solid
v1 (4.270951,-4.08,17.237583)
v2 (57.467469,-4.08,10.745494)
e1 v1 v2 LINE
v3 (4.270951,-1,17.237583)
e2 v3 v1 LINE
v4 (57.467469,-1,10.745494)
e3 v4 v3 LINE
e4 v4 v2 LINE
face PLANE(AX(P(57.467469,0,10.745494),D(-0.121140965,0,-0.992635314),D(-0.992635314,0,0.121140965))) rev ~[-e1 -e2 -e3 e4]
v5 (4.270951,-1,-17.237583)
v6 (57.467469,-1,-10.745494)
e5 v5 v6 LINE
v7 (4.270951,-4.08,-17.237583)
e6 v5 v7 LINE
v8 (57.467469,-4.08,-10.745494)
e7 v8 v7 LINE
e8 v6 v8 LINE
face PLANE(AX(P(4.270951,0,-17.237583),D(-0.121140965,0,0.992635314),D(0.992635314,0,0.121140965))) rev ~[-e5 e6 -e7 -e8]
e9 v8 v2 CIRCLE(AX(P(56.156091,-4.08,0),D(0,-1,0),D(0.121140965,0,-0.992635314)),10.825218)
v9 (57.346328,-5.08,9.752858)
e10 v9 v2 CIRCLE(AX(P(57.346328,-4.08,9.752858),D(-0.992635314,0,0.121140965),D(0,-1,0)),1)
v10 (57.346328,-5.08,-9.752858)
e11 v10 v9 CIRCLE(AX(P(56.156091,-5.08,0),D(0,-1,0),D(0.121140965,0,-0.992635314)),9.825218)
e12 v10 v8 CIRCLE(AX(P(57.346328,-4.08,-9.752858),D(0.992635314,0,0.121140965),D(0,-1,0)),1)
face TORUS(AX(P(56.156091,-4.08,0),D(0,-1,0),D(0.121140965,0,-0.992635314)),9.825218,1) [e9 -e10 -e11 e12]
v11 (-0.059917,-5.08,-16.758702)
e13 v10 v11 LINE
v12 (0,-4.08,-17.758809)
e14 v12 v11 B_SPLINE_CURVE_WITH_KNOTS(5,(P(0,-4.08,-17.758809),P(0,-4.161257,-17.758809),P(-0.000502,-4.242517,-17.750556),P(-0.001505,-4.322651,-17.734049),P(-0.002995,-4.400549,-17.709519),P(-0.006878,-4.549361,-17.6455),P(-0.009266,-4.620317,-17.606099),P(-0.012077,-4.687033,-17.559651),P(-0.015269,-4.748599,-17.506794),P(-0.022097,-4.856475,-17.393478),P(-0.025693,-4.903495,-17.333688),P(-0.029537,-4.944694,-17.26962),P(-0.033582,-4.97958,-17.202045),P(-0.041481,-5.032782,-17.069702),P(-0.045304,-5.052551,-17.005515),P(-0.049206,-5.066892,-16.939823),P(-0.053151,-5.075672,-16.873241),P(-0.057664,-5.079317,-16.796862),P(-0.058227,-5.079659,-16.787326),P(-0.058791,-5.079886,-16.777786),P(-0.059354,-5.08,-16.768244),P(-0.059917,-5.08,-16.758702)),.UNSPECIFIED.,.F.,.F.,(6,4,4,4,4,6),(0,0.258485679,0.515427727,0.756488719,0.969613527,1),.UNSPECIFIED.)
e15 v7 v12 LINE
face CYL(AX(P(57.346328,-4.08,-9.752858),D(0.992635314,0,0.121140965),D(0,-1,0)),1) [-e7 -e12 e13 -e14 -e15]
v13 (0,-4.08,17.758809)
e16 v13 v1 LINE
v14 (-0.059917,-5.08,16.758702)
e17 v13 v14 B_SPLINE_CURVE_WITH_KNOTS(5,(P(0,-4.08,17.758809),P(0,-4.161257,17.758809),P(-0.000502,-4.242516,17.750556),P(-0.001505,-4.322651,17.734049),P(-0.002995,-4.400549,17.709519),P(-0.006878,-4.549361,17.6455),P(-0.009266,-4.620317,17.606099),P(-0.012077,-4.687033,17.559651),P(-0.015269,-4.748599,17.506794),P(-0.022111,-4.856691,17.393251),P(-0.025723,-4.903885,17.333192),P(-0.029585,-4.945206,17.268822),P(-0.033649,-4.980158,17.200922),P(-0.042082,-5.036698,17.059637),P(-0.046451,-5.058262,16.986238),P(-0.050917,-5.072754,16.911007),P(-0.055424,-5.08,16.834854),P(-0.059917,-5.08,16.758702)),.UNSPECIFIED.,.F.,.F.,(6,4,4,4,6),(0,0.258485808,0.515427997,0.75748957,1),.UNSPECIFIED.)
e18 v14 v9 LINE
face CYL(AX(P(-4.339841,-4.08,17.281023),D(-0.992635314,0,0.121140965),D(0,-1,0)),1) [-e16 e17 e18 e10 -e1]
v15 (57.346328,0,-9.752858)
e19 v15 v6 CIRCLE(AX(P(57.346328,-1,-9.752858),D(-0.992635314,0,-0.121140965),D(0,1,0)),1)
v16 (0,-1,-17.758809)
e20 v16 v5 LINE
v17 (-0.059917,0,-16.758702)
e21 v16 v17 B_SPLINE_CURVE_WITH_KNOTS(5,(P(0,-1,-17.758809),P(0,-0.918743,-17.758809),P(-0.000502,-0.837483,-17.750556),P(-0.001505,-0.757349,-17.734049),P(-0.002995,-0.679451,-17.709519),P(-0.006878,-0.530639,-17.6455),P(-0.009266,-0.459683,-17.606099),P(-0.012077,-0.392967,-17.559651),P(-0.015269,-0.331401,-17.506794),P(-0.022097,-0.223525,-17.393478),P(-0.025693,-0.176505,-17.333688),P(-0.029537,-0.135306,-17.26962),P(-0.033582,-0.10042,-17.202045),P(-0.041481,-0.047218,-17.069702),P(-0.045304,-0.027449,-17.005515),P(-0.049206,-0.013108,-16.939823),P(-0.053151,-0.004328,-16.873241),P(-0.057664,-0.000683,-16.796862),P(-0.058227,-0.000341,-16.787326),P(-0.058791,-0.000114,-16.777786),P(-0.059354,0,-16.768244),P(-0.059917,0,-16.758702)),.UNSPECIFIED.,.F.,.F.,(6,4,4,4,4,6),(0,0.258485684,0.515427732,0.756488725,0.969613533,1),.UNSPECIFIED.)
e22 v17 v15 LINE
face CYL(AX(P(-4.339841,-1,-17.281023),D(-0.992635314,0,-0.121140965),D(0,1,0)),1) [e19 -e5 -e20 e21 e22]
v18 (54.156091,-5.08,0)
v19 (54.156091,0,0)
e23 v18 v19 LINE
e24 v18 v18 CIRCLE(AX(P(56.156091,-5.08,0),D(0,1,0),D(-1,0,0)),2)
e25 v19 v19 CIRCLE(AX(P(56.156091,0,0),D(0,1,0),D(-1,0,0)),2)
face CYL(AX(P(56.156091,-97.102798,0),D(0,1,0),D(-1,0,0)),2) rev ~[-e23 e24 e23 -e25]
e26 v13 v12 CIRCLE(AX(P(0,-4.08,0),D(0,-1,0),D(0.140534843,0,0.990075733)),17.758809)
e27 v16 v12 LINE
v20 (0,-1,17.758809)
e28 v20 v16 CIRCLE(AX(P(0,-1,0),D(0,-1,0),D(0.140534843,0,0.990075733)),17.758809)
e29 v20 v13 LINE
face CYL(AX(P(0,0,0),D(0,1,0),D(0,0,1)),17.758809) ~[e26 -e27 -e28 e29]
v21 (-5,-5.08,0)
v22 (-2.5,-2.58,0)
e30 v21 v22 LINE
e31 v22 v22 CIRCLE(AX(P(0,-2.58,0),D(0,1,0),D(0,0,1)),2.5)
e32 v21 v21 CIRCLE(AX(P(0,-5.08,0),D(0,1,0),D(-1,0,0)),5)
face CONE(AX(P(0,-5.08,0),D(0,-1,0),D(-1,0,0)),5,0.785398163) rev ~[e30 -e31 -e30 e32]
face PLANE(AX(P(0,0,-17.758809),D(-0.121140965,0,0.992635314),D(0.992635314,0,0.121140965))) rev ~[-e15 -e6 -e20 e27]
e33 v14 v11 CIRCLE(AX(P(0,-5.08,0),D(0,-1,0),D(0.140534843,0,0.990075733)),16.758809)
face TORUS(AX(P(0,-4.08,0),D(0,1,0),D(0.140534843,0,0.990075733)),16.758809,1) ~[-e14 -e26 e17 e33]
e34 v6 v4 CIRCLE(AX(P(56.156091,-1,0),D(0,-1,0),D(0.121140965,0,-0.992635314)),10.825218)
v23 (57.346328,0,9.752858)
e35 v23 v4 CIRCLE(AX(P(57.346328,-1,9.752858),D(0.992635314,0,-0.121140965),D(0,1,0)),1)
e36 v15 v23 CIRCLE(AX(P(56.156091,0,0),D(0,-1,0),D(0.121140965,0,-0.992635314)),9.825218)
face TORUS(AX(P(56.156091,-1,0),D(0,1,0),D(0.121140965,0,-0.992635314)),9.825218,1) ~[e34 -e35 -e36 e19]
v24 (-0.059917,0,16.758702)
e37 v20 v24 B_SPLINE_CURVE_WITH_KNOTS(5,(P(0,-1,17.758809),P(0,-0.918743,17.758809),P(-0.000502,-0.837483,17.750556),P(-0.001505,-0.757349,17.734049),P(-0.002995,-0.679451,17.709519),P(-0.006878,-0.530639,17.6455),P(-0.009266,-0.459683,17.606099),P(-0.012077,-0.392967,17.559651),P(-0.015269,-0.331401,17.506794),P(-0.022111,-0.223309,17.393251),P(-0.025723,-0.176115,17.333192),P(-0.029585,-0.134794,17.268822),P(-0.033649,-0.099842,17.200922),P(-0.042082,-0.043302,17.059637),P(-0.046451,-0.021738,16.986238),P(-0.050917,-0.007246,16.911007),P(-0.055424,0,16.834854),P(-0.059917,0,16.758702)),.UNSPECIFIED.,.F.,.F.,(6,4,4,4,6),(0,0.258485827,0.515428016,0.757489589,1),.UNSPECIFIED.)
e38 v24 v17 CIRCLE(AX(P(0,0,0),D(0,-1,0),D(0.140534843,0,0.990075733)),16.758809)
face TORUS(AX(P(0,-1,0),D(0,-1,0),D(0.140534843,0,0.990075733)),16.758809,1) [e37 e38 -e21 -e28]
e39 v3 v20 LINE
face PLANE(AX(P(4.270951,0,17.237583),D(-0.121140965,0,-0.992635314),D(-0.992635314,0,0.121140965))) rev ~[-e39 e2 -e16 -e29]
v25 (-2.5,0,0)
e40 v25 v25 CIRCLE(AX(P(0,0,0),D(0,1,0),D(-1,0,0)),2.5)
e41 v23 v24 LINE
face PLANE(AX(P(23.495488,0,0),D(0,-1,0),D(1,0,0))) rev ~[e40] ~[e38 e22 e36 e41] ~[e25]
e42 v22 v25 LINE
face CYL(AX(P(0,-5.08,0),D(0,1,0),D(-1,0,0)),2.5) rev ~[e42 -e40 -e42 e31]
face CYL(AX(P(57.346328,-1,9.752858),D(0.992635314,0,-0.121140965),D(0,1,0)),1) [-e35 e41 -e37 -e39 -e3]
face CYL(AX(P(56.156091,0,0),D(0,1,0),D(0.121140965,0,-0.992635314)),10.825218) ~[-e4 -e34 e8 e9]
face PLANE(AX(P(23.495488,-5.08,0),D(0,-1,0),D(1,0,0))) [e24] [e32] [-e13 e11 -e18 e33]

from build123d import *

# Parameters (mm, degrees)
F1_DEPTH       = 5.08
F2_T1_DEPTH    = 62.1438386925
F2_T3_DEPTH    = 62.1438386925
F2_T6_ANGLE    = 166.0840890898
F2_T8_ANGLE    = 196.1575929171
F3_T1_DEPTH    = 62.1438386925
F3_T3_DEPTH    = 62.1438386925
F3_T6_ANGLE    = 166.0840890898
F3_T8_ANGLE    = 196.1575929171
F5_D           = 5
F5_CSINK_D     = 10
F5_CSINK_ANGLE = 90
F6_D           = 4


# Not quite as in the source:
# - a fillet or chamfer that OpenCascade refuses, or shapes differently, is made with other operations: its cross-section is extruded or revolved along the edge and cut away or added


with BuildPart() as f1:
    # F0 (on Front) → F1 (new body)
    with BuildSketch(Plane.XZ):
        with BuildLine():
            Line((57.4674687515, 10.7454937358), (4.2709509748, 17.237583418))
            Line((4.2709509748, 17.237583418), (0, 17.7588092034))
            ThreePointArc((0, 17.7588092034), (-17.7588092034, 0), (0, -17.7588092034))
            Line((0, -17.7588092034), (4.2709509748, -17.237583418))
            Line((4.2709509748, -17.237583418), (57.4674687515, -10.7454937358))
            ThreePointArc((57.4674687515, -10.7454937358), (66.9813094594, 0), (57.4674687515, 10.7454937358))
        make_face()
    extrude(amount=F1_DEPTH)

    # F2: fillet of radius 1 on 4 edges, made by hand

    # F2_s2 → F2_t1 (cut)
    with BuildSketch(Plane(origin=(-6.354175572, 0, 0.7754619925), x_dir=(0, 1, 0), z_dir=(0.992635314, 0, -0.1211409647))):
        with BuildLine():
            ThreePointArc((-5.08, 16.6280211506), (-4.7871067812, 17.3351279318), (-4.08, 17.6280211506))
            Line((-4.08, 17.6280211506), (-5.08, 17.6280211506))
            Line((-5.08, 17.6280211506), (-5.08, 16.6280211506))
        make_face()
    extrude(amount=F2_T1_DEPTH, mode=Mode.SUBTRACT)

    # F2_s4 → F2_t3 (cut)
    with BuildSketch(Plane(origin=(55.3319932641, 0, 6.7527025749), x_dir=(0, 1, 0), z_dir=(-0.992635314, 0, -0.1211409647))):
        with BuildLine():
            ThreePointArc((-5.08, 16.6280211506), (-4.7871067812, 17.3351279318), (-4.08, 17.6280211506))
            Line((-4.08, 17.6280211506), (-5.08, 17.6280211506))
            Line((-5.08, 17.6280211506), (-5.08, 16.6280211506))
        make_face()
    extrude(amount=F2_T3_DEPTH, mode=Mode.SUBTRACT)

    # F2_s5 → F2_t6 (revolve, cut)
    with BuildSketch(Plane(origin=(55.3319932641, 0, 6.7527025749), x_dir=(0, 1, 0), z_dir=(-0.992635314, 0, -0.1211409647))):
        with BuildLine():
            ThreePointArc((-4.08, 17.6280211506), (-4.7871067812, 17.3351279318), (-5.08, 16.6280211506))
            Line((-5.08, 16.6280211506), (-5.08, 17.6280211506))
            Line((-5.08, 17.6280211506), (-4.08, 17.6280211506))
        make_face()
    revolve(axis=Axis((56.156091392, -5.08, 0), (0, -1, 0)), revolution_arc=F2_T6_ANGLE, mode=Mode.SUBTRACT)

    # F2_s7 → F2_t8 (revolve, cut)
    with BuildSketch(Plane(origin=(0, 0, 0), x_dir=(0, 1, 0), z_dir=(0.9900757335, 0, -0.1405348426))):
        with BuildLine():
            ThreePointArc((-5.08, 16.7588092034), (-4.7871067812, 17.4659159846), (-4.08, 17.7588092034))
            Line((-4.08, 17.7588092034), (-5.08, 17.7588092034))
            Line((-5.08, 17.7588092034), (-5.08, 16.7588092034))
        make_face()
    revolve(axis=Axis((0, -5.08, 0), (0, -1, 0)), revolution_arc=F2_T8_ANGLE, mode=Mode.SUBTRACT)

    # F3: fillet of radius 1 on 4 edges, made by hand

    # F3_s2 → F3_t1 (cut)
    with BuildSketch(Plane(origin=(55.3319932641, 0, -6.7527025749), x_dir=(0, 1, 0), z_dir=(-0.992635314, 0, 0.1211409647))):
        with BuildLine():
            ThreePointArc((0, -16.6280211506), (-0.2928932188, -17.3351279318), (-1, -17.6280211506))
            Line((-1, -17.6280211506), (0, -17.6280211506))
            Line((0, -17.6280211506), (0, -16.6280211506))
        make_face()
    extrude(amount=F3_T1_DEPTH, mode=Mode.SUBTRACT)

    # F3_s4 → F3_t3 (cut)
    with BuildSketch(Plane(origin=(-6.354175572, 0, -0.7754619925), x_dir=(0, 1, 0), z_dir=(0.992635314, 0, 0.1211409647))):
        with BuildLine():
            ThreePointArc((0, -16.6280211506), (-0.2928932188, -17.3351279318), (-1, -17.6280211506))
            Line((-1, -17.6280211506), (0, -17.6280211506))
            Line((0, -17.6280211506), (0, -16.6280211506))
        make_face()
    extrude(amount=F3_T3_DEPTH, mode=Mode.SUBTRACT)

    # F3_s5 → F3_t6 (revolve, cut)
    with BuildSketch(Plane(origin=(55.3319932641, 0, 6.7527025749), x_dir=(0, 1, 0), z_dir=(-0.992635314, 0, -0.1211409647))):
        with BuildLine():
            ThreePointArc((-1, 17.6280211506), (-0.2928932188, 17.3351279318), (0, 16.6280211506))
            Line((0, 16.6280211506), (0, 17.6280211506))
            Line((0, 17.6280211506), (-1, 17.6280211506))
        make_face()
    revolve(axis=Axis((56.156091392, 0, 0), (0, -1, 0)), revolution_arc=F3_T6_ANGLE, mode=Mode.SUBTRACT)

    # F3_s7 → F3_t8 (revolve, cut)
    with BuildSketch(Plane(origin=(0, 0, 0), x_dir=(0, 1, 0), z_dir=(0.9900757335, 0, -0.1405348426))):
        with BuildLine():
            ThreePointArc((0, 16.7588092034), (-0.2928932188, 17.4659159846), (-1, 17.7588092034))
            Line((-1, 17.7588092034), (0, 17.7588092034))
            Line((0, 17.7588092034), (0, 16.7588092034))
        make_face()
    revolve(axis=Axis((0, 0, 0), (0, -1, 0)), revolution_arc=F3_T8_ANGLE, mode=Mode.SUBTRACT)

    # F5 (through all)
    with Locations(Plane.XZ.offset(5.08)):
        with Locations((0, 0)):
            CounterSinkHole(F5_D / 2, F5_CSINK_D / 2, counter_sink_angle=F5_CSINK_ANGLE)

    # F6 (through all)
    with Locations(Plane.XZ.offset(5.08)):
        with Locations((56.156091392, 0)):
            Hole(F6_D / 2)


solid = f1.part
